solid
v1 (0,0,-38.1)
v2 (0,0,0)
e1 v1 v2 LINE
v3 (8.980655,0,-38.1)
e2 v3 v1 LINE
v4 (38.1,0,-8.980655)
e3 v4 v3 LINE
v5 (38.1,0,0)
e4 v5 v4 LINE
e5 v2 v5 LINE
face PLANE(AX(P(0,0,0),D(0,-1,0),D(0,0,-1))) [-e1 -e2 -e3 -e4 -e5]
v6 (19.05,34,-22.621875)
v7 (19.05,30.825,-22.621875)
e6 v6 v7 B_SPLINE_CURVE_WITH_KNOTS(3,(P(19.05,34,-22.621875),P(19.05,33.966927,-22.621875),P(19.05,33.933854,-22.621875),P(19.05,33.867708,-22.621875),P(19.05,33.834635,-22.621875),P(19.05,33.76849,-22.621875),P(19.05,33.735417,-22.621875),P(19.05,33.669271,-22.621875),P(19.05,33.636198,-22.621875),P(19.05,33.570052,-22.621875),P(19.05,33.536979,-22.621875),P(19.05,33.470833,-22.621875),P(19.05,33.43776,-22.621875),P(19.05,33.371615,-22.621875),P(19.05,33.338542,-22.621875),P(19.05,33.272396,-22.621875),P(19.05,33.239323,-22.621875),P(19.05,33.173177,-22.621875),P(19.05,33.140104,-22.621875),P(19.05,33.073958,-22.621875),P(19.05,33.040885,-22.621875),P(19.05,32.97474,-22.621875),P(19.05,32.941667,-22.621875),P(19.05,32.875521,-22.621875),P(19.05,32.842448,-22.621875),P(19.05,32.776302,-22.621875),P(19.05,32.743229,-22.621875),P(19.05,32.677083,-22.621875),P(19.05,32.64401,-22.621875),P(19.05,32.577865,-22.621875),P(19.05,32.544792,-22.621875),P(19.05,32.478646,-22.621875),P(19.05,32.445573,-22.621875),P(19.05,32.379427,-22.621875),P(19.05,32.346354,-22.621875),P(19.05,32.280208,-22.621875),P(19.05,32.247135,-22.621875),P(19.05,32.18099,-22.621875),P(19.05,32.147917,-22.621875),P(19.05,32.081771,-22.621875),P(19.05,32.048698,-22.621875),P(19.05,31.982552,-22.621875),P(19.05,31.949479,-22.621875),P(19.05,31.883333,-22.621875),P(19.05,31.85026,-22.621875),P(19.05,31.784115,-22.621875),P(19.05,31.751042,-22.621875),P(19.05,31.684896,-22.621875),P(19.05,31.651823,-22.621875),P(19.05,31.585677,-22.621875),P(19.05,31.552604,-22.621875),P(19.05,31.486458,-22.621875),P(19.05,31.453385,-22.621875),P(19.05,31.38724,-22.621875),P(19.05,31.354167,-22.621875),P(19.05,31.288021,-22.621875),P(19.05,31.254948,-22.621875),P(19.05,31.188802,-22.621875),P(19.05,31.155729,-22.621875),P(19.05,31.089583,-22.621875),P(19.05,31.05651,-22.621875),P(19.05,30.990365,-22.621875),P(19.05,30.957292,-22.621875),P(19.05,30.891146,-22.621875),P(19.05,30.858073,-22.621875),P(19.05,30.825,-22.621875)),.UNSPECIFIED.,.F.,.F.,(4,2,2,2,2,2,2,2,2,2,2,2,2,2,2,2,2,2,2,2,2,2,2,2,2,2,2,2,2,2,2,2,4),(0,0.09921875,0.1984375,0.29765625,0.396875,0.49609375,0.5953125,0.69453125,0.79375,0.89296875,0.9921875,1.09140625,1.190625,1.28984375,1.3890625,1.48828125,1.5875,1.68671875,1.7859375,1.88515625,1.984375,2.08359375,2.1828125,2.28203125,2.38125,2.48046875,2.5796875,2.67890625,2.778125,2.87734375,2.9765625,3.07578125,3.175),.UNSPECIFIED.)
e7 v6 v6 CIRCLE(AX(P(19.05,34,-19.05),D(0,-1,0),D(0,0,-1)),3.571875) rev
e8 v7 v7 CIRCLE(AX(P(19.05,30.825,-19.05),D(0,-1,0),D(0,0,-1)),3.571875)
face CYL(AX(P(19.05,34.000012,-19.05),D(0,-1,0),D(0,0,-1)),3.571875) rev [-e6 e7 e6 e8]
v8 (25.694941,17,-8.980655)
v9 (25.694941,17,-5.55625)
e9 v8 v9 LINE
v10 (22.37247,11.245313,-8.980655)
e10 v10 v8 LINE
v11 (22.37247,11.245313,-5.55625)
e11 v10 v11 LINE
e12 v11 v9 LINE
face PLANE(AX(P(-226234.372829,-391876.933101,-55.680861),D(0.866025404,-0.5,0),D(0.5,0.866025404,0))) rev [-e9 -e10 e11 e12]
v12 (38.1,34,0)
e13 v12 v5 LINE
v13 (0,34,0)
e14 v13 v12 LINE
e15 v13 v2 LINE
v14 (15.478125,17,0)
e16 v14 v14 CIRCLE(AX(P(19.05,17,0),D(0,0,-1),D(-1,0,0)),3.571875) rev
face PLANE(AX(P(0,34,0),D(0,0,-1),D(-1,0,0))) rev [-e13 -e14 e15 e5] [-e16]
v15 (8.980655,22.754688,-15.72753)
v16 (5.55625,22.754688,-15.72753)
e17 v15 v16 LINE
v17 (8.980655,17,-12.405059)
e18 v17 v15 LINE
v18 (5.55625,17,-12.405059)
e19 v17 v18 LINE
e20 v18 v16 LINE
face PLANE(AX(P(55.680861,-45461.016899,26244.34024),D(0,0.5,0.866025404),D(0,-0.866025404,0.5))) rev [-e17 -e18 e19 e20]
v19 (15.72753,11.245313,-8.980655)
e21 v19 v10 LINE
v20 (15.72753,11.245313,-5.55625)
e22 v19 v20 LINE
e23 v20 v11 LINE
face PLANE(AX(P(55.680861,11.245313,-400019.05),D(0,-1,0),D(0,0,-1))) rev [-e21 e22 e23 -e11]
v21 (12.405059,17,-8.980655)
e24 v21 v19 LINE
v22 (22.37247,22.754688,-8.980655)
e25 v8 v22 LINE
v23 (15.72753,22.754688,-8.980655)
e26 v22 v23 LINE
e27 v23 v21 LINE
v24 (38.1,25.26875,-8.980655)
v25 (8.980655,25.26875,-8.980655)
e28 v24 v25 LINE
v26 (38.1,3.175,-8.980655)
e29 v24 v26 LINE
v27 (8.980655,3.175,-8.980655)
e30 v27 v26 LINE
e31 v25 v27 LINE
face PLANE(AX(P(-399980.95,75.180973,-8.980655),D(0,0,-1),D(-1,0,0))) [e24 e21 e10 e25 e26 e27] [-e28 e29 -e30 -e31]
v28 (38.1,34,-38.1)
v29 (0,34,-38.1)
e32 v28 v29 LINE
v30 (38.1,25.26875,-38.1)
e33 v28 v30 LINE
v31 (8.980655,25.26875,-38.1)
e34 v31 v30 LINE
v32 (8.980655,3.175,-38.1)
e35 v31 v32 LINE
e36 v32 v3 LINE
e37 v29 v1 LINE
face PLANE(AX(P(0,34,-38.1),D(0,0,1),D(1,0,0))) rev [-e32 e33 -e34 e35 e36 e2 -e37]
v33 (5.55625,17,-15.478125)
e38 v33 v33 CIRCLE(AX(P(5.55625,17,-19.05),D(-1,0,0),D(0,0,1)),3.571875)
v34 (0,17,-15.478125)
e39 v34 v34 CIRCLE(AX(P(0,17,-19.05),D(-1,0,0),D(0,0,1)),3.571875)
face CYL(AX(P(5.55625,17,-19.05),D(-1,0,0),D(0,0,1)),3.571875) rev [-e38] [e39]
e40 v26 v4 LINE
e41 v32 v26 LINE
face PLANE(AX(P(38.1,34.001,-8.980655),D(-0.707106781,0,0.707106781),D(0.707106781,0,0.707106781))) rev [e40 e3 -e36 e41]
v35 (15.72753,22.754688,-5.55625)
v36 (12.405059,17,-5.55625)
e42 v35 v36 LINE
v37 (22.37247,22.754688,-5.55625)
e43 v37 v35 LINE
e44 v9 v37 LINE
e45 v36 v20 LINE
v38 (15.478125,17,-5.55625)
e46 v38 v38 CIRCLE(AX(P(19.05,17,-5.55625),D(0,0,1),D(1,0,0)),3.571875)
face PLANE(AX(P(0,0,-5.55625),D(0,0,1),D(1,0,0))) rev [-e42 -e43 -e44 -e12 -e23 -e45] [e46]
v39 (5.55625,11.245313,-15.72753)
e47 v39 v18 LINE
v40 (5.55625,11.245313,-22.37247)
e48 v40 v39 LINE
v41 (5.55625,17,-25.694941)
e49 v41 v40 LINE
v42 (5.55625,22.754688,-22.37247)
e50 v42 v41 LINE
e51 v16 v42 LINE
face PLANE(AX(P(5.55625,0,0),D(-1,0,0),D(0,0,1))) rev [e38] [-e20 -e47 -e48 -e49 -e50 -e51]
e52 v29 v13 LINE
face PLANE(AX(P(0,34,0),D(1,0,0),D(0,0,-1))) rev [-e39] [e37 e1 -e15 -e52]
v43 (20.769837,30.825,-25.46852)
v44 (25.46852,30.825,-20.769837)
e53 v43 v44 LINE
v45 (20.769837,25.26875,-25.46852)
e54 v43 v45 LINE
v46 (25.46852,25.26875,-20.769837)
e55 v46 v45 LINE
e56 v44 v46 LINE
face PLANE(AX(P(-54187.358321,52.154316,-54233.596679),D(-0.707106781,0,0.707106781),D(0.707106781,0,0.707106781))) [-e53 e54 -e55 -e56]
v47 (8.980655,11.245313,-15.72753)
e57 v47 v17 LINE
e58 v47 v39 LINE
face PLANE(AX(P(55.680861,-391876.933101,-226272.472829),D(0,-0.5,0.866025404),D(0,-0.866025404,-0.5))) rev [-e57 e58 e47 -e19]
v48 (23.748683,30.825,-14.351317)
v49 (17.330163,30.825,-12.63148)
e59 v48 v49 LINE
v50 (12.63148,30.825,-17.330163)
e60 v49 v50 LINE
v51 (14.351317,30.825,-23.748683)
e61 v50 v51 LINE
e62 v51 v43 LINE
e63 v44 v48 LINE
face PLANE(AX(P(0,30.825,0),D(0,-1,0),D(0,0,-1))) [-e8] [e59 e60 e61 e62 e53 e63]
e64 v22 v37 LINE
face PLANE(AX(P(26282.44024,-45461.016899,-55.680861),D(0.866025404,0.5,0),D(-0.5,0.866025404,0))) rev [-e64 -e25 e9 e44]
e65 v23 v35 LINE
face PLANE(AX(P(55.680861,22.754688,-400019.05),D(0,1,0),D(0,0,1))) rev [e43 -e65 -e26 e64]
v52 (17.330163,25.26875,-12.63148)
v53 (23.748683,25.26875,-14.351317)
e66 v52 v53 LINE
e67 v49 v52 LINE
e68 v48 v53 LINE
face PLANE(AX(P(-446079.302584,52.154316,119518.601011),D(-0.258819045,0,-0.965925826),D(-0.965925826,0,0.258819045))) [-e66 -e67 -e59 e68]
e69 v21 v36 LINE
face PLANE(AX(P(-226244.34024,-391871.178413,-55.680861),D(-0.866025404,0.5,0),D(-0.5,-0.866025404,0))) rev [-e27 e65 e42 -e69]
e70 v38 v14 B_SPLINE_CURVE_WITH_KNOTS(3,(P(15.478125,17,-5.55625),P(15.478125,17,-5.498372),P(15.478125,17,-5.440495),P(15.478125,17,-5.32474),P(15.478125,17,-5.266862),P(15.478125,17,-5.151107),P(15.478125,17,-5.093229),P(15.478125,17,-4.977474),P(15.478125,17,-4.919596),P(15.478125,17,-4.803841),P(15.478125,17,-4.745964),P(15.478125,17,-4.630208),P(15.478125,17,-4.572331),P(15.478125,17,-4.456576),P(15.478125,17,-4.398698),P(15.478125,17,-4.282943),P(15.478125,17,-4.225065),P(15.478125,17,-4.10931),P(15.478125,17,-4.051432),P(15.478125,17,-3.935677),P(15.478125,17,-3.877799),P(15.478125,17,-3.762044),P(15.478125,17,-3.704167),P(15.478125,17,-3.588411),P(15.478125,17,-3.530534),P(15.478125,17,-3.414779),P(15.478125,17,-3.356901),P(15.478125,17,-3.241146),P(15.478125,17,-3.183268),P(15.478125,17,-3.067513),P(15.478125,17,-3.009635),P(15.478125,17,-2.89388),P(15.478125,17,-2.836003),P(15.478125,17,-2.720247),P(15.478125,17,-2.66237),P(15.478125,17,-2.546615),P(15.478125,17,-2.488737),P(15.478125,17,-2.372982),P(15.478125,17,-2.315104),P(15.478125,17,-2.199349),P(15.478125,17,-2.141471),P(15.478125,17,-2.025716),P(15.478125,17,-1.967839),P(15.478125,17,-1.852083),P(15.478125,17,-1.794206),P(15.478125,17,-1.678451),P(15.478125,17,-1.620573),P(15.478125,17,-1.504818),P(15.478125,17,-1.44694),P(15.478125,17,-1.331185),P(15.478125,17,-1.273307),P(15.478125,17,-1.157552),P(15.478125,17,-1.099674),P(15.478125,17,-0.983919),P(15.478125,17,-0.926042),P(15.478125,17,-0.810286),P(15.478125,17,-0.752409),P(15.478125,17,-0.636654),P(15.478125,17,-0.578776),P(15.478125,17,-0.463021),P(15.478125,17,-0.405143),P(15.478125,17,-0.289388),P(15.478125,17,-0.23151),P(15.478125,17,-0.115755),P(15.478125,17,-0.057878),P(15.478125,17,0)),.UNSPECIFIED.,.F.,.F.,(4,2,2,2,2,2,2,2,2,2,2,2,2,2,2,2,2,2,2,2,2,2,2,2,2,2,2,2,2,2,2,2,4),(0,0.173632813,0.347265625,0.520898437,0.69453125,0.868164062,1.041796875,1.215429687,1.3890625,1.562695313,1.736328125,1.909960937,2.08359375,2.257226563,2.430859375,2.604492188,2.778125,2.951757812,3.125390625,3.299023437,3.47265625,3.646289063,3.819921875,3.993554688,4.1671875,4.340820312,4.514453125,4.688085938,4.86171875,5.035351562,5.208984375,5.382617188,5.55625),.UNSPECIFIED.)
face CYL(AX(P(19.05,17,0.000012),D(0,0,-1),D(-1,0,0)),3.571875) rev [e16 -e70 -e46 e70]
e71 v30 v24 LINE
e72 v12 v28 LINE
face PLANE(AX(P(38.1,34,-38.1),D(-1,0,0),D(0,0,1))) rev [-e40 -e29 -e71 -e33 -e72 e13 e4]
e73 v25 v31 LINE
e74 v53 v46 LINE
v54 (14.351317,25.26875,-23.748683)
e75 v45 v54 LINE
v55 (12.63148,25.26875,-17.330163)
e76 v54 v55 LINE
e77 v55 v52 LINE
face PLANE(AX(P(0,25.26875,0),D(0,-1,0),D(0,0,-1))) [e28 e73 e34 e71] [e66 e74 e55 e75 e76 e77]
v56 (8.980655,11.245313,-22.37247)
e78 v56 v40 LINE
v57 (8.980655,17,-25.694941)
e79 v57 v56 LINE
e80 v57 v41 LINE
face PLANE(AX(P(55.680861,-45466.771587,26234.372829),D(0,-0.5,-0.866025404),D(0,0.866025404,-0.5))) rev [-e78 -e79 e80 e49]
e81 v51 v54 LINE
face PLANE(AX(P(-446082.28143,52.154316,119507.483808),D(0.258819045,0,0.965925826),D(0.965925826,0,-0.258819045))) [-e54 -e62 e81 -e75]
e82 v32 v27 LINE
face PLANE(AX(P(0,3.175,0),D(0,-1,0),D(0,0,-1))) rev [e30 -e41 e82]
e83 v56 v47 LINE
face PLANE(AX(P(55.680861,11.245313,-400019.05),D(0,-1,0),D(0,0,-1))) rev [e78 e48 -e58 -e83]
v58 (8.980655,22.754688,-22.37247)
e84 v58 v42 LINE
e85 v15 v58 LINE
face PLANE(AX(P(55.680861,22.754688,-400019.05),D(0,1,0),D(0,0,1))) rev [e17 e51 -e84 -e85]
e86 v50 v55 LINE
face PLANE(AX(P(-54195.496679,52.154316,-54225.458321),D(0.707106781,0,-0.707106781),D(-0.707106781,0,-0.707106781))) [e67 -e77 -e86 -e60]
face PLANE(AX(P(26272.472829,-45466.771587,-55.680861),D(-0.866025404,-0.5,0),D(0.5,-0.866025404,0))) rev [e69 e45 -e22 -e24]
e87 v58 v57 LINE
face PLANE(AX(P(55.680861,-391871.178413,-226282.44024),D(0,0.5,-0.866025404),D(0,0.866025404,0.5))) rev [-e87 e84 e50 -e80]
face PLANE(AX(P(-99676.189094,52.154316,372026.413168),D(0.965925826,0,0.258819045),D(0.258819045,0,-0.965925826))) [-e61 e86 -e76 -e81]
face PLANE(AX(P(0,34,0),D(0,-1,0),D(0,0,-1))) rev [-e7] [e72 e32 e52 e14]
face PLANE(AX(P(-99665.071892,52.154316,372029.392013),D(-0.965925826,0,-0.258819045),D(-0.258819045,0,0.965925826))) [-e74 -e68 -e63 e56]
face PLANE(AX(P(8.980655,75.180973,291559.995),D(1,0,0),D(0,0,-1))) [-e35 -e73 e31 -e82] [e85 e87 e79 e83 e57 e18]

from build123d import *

# Parameters (mm, degrees)
SKETCH1_W                    = 38.1
SKETCH1_H                    = 38.1
MAIN_BODY_DEPTH              = 34
F_9_32_RIGHT_RAIL_DEPTH      = 64.712008287
F_9_32_RIGHT_RAIL_DEPTH_BACK = 5.55625
SKETCH3_R                    = 3.571875
SKETCH4_R                    = 3.571875
F_9_32_LEFT_RAIL_DEPTH       = 5.55625
F_9_32_TOPPER_DEPTH          = 64.712008287
F_9_32_TOPPER_DEPTH_BACK     = 10
SKETCH8_R                    = 3.571875
CUT_EXTRUDE3_START           = -5.55625
CUT_EXTRUDE3_DEPTH           = 32.54375
CUT_EXTRUDE4_START           = -5.55625
CUT_EXTRUDE4_DEPTH           = 32.54375
CUT_EXTRUDE12_START          = -30.825
CUT_EXTRUDE12_OUTLINE_W      = 29.119345377
CUT_EXTRUDE12_OUTLINE_H      = 29.119345377
CUT_EXTRUDE12_DEPTH          = 22.09375
CUT_EXTRUDE15_START          = -17
CUT_EXTRUDE15_DEPTH          = 13.825
CUT_EXTRUDE16_REACH          = 65.712


# Read off the part's stored shape, not the designer's step: Cut-Extrude12
with BuildPart() as part:
    # Sketch1 → Main Body (new body)
    with BuildSketch(Plane(origin=(0, 0, 0), x_dir=(1, 0, 0), z_dir=(0, 1, 0))):
        with Locations((19.05, 19.05)):
            Rectangle(SKETCH1_W, SKETCH1_H)
    extrude(amount=MAIN_BODY_DEPTH)

    # Sketch3 → 9/32 Right Rail (cut, two sides: drawn at the far end of the back side and taken through both)
    with BuildSketch(Plane.XY.offset(-F_9_32_RIGHT_RAIL_DEPTH_BACK)):
        with Locations(Location((19.05, 17, 0), (0, 0, 180))):
            Circle(SKETCH3_R)
    extrude(amount=F_9_32_RIGHT_RAIL_DEPTH + F_9_32_RIGHT_RAIL_DEPTH_BACK, mode=Mode.SUBTRACT)

    # Sketch4 → 9/32 Left Rail (cut)
    with BuildSketch(Plane.ZY):
        with Locations((-19.05, 17)):
            Circle(SKETCH4_R)
    extrude(amount=-F_9_32_LEFT_RAIL_DEPTH, mode=Mode.SUBTRACT)

    # Sketch8 → 9/32 Topper (cut, two sides: drawn at the far end of the back side and taken through both)
    with BuildSketch(Plane(origin=(0, 34, 0), x_dir=(1, 0, 0), z_dir=(0, 1, 0)).offset(-F_9_32_TOPPER_DEPTH_BACK)):
        with Locations(Location((19.05, 19.05, 0), (0, 0, 90))):
            Circle(SKETCH8_R)
    extrude(amount=F_9_32_TOPPER_DEPTH + F_9_32_TOPPER_DEPTH_BACK, mode=Mode.SUBTRACT)

    # Sketch9 → Cut-Extrude3 (cut)
    with BuildSketch(Plane.ZY.offset(CUT_EXTRUDE3_START)):
        Polygon((-22.372470377, 22.7546875), (-25.694940754, 17), (-22.372470377, 11.2453125), (-15.727529623, 11.2453125), (-12.405059246, 17), (-15.727529623, 22.7546875), align=None)
    extrude(amount=-CUT_EXTRUDE3_DEPTH, mode=Mode.SUBTRACT)

    # Sketch10 → Cut-Extrude4 (cut)
    with BuildSketch(Plane.XY.offset(CUT_EXTRUDE4_START)):
        Polygon((15.727529623, 22.7546875), (12.405059246, 17), (15.727529623, 11.2453125), (22.372470377, 11.2453125), (25.694940754, 17), (22.372470377, 22.7546875), align=None)
    extrude(amount=-CUT_EXTRUDE4_DEPTH, mode=Mode.SUBTRACT)

    # Cut-Extrude12 outline → Cut-Extrude12 (cut)
    with BuildSketch(Plane(origin=(0, 34, 0), x_dir=(1, 0, 0), z_dir=(0, 1, 0)).offset(CUT_EXTRUDE12_START)):
        with Locations((23.540327312, 23.540327312)):
            Rectangle(CUT_EXTRUDE12_OUTLINE_W, CUT_EXTRUDE12_OUTLINE_H)
    extrude(amount=CUT_EXTRUDE12_DEPTH, mode=Mode.SUBTRACT)

    # Sketch14 → Cut-Extrude15 (cut)
    with BuildSketch(Plane(origin=(0, 34, 0), x_dir=(1, 0, 0), z_dir=(0, 1, 0)).offset(CUT_EXTRUDE15_START)):
        Polygon((23.748682668, 14.351317332), (25.468519889, 20.769837221), (20.769837221, 25.468519889), (14.351317332, 23.748682668), (12.631480111, 17.330162779), (17.330162779, 12.631480111), align=None)
    extrude(amount=CUT_EXTRUDE15_DEPTH, mode=Mode.SUBTRACT)

    # Sketch15 → Cut-Extrude16 (cut, up to next)
    with BuildSketch(Plane.XZ, mode=Mode.PRIVATE) as cut_extrude16_sk1:
        Polygon((38.1, -8.980654623), (8.980654623, -38.1), (38.1, -38.1), align=None)
    cut_extrude16_tool1 = extrude(cut_extrude16_sk1.sketch, amount=-CUT_EXTRUDE16_REACH, mode=Mode.PRIVATE) & part.part
    add(cut_extrude16_tool1.solids().sort_by_distance((28.393552, 0, -28.393552))[0], mode=Mode.SUBTRACT)


solid = part.part
